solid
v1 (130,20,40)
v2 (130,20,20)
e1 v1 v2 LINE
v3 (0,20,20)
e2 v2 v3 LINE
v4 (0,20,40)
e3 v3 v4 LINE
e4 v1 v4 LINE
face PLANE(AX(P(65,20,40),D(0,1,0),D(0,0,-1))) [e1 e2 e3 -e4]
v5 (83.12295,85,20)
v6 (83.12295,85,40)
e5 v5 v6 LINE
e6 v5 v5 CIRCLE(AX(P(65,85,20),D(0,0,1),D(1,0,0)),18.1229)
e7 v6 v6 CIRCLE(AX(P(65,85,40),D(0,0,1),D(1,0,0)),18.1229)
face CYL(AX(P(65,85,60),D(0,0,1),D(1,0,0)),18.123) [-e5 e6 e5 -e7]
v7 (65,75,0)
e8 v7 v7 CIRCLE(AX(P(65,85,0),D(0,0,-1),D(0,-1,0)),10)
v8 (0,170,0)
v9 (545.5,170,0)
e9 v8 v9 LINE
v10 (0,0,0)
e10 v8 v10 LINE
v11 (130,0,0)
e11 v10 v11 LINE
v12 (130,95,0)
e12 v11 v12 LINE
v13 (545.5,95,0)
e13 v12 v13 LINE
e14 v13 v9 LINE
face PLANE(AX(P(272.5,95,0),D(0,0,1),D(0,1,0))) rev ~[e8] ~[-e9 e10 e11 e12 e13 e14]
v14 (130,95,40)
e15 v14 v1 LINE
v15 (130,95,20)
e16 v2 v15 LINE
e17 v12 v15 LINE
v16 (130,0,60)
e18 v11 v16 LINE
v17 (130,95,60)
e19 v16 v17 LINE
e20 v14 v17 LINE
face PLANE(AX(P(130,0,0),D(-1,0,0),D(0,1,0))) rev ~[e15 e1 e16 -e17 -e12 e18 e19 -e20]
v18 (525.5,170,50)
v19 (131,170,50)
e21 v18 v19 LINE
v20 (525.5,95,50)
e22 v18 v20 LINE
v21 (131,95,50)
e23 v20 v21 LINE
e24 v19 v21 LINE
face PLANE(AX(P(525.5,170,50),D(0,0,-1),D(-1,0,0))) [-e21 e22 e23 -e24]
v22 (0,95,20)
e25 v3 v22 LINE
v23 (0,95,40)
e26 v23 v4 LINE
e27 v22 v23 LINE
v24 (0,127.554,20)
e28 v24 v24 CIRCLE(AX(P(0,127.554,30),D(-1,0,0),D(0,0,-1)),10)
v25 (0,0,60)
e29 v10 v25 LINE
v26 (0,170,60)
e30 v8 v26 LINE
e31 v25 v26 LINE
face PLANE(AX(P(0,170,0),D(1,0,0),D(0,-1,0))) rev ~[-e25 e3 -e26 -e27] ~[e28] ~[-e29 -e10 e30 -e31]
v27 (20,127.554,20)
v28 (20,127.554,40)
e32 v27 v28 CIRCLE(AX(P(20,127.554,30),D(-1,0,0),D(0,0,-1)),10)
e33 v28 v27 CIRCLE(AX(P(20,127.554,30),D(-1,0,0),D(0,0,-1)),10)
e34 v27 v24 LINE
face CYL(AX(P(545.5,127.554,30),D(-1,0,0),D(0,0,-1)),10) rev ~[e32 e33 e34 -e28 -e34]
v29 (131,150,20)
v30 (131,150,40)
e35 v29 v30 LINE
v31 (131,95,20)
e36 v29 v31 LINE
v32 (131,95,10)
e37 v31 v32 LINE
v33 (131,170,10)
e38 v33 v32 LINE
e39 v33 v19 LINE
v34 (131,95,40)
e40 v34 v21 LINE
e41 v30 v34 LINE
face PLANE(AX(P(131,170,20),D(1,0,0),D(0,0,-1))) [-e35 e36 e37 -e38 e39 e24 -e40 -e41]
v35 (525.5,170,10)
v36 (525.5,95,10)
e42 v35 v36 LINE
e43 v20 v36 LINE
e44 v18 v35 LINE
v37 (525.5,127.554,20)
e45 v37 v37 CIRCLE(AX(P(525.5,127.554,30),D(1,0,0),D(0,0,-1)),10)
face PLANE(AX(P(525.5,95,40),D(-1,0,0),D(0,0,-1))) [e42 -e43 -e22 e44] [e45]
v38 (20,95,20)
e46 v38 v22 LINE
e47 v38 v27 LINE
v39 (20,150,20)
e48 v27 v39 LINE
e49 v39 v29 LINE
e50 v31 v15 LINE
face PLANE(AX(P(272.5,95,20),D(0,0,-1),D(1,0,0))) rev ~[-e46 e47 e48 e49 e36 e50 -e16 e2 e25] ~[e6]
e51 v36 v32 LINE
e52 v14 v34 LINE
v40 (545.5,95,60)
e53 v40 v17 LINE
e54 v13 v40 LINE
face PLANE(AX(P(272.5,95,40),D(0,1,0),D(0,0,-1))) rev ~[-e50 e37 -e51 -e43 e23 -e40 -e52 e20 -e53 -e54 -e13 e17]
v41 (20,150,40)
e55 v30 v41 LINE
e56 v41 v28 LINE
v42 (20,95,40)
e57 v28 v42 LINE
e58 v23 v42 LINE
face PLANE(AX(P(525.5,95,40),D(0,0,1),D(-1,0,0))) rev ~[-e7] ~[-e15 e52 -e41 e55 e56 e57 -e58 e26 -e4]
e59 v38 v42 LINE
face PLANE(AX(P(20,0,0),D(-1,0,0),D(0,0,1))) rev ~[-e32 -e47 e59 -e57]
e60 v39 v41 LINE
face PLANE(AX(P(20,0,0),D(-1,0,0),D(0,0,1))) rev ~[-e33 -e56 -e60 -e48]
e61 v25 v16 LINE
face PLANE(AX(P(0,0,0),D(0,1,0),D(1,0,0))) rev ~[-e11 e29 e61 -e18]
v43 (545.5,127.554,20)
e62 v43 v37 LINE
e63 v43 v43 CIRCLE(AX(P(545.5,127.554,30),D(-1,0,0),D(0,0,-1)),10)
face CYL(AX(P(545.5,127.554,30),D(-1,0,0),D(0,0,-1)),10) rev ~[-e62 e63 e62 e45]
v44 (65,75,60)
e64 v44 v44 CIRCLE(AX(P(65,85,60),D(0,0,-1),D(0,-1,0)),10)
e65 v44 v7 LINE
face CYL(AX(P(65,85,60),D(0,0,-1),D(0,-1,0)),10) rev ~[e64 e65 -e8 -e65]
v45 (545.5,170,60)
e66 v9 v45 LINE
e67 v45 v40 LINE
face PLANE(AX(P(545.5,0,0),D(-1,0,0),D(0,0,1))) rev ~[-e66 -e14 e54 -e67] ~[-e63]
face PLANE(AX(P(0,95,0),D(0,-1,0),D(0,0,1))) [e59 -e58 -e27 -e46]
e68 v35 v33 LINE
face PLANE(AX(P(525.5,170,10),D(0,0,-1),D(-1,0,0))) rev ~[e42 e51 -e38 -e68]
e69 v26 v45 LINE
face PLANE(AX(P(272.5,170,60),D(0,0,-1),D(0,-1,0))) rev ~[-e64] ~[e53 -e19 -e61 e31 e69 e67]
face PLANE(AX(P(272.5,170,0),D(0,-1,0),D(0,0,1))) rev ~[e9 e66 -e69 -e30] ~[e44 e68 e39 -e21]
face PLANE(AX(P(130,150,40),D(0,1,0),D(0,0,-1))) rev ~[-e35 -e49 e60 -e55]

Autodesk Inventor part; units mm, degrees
ref_plane "YZ Plane" through (0, 0, 0) normal (1, 0, 0) x (0, 1, 0)
ref_plane "XZ Plane" through (0, 0, 0) normal (0, 1, 0) x (-1, 0, 0)
sketch "Boceto1" plane through (0, 0, 0) normal (0, 0, 1) x (1, 0, 0)
  line L0 (0, 0) -> (130, 0)
  line L1 (130, 0) -> (130, 95)
  line L2 (130, 95) -> (545, 95)
  line L3 (545, 95) -> (545, 170)
  line L4 (545, 170) -> (0, 170)
  line L5 (0, 170) -> (0, 0)
  circle A0 centre (65, 85) radius 10
  dimension "d1" = 95
  dimension "d3" = 75
  dimension "d19" = 20
extrude "Extrusión1" add sketch "Boceto1" along normal blind 60 contours L5 L4 L3 L2 L1 L0 | A0
ref_plane "Plano de trabajo1" through (65, 0, 0) normal (1, 0, 0) x (0, 0, -1)
sketch "Boceto2" plane through (65, 0, 0) normal (1, 0, 0) x (0, 0, -1)
  line L0 (-20, 75) -> (-40, 75)
  line L1 (-40, 75) -> (-40, 20)
  line L2 (0, 0) -> (-60, 0) projected
  line L3 (-40, 20) -> (-20, 20)
  line L4 (-20, 75) -> (-20, 20)
  dimension "d8" = 20
  dimension "d9" = 55
  dimension "d10" = 20
extrude "Extrusión2" cut sketch "Boceto2" along normal blind 400 and the other way blind 200
sketch "Boceto3" plane through (130, 0, 0) normal (1, 0, 0) x (0, 0, -1)
  line L0 (-20, 75) -> (-40, 75) projected
  line L1 (-40, 75) -> (-40, 150)
  line L2 (0, 170) -> (-60, 170) projected
  line L3 (-40, 150) -> (-20, 150)
  line L4 (-20, 150) -> (-20, 75)
  point P0 (0, 0)
  dimension "d15" = 75
  dimension "d16" = 20
extrude "Extrusión3" cut sketch "Boceto3" along normal mid plane 7000
sketch "Boceto4" plane through (65, 0, 0) normal (1, 0, 0) x (0, 0, -1)
  point P0 (0, 0)
sketch "Boceto5" plane through (0, 0, 60) normal (0, 0, 1) x (1, 0, 0)
  line L0 (130, 95) -> (545, 95) projected
  line L1 (545, 170) -> (0, 170) projected
  line L2 (0, 0) -> (130, 0) projected
  point P0 (65, 85)
hole "Agujero1" at (65, 85, 60) direction (0, 0, -1) diameter 0.2159 end through all thread size "30-318 UNM" class "2B" standard "ANSI Unified Screw Threads"
sketch "Boceto6" plane through (0, 0, 0) normal (-1, 0, 0) x (0, 0, 1)
  line L0 (0, 170) -> (0, 0) projected
  line L1 (40, 95) -> (60, 95) projected
  line L2 (0, 95) -> (60, 95)
  line L3 (0, 95) -> (0, 170)
  line L4 (0, 170) -> (60, 170) projected
  line L5 (60, 170) -> (60, 95)
extrude "Extrusión4" add sketch "Boceto6" against normal blind 20
ref_plane "Plano de trabajo8" through (272.5, 0, 0) normal (-1, 0, 0) x (0, 0, 1)
sketch "Boceto7" plane through (272.5, 0, 0) normal (-1, 0, 0) x (0, 0, 1)
  line L0 (40, 95) -> (60, 95) projected
  line L1 (0, 75) -> (0, 95) projected
  line L2 (60, 95) -> (0, 95)
  line L3 (0, 95) -> (0, 170)
  line L4 (0, 170) -> (60, 170)
  line L5 (60, 0) -> (60, 95) projected
  line L6 (60, 170) -> (60, 95)
  point P0 (0, 0)
extrude "Extrusión5" add sketch "Boceto7" against normal blind 273
sketch "Boceto8" plane through (130, 95, 0) normal (0, -1, 0) x (1, 0, 0)
  line L0 (-130, 60) -> (415.5, 60) projected
  line L1 (415.5, 0) -> (415.5, 60) projected
  line L2 (395.5, 40) -> (395.5, 20)
  line L3 (0, 0) -> (415.5, 0) projected
  line L4 (395.5, 40) -> (142.5, 40)
  line L5 (142.5, 20) -> (0, 20) projected
  line L6 (142.5, 40) -> (142.5, 20)
  line L7 (142.5, 20) -> (395.5, 20)
  point P0 (-130, 0)
  point P1 (415, 60)
  point P2 (415, 0)
  point P3 (415, 20)
  dimension "d35" = 20
extrude "Extrusión6" cut sketch "Boceto8" against normal blind 75
sketch "Boceto9" plane through (130, 95, 0) normal (0, -1, 0) x (1, 0, 0)
  line L0 (142.5, 20) -> (142.5, 40) projected
  line L1 (142.5, 20) -> (142.5, 40)
  line L2 (142.5, 40) -> (1, 40)
  line L3 (1, 40) -> (1, 20)
  line L4 (142.5, 20) -> (-110, 20) projected
  line L5 (1, 20) -> (142.5, 20)
  point P0 (-130, 0)
extrude "Extrusión7" cut sketch "Boceto9" against normal blind 75
sketch "Boceto10" plane through (0, 0, 60) normal (0, 0, 1) x (1, 0, 0)
  point P0 (0, 0)
ref_plane "Plano de trabajo9" through (535.5, 0, 0) normal (1, 0, 0) x (0, 0, -1)
sketch "Boceto11" plane through (545.5, 0, 0) normal (1, 0, 0) x (0, 0, -1)
  line L0 (0, 95) -> (-20, 95) projected
  line L1 (0, 170) -> (-60, 170) projected
  line L2 (0, 95) -> (-60, 170)
  line L3 (-60, 84.892) -> (-60, 85.108) projected
  line L4 (0, 170) -> (-60, 85.108)
  circle A0 centre (-30, 127.554) radius 10
  point P0 (0, 0)
  dimension "d40" = 20
hole "Agujero2" at (545.5, 127.554, 30) direction (-1, 0, 0) diameter 20 end through all
sketch "Boceto12" plane through (0, 0, 60) normal (0, 0, 1) x (1, 0, 0)
  line L0 (0, 170) -> (0, 0) projected
  line L1 (130, 0) -> (130, 95) projected
  line L2 (0, 170) -> (130, 0)
  line L3 (130, 95) -> (130, 170)
  line L4 (130, 170) -> (0, 0)
  circle A0 centre (65, 85) radius 10
  dimension "d48" = 20
hole "Agujero3" at (65, 85, 60) direction (0, 0, -1) diameter 20 end through all
extrude "Extrusión8" [suppressed]
hole "Agujero4" at (65, 85, 60) direction (0, 0, -1) diameter 17.8943 end through all thread size "13/16-10 UNC" class "2B" standard "ANSI Unified Screw Threads"
sketch "Boceto13" plane through (0, 170, 60) normal (0, 1, 0) x (1, 0, 0)
  line L0 (131, 40) -> (131, 50)
  line L1 (525.5, 20) -> (525.5, 40) projected
  line L2 (525.5, 40) -> (525.5, 50)
  line L3 (525.5, 50) -> (131, 50)
  line L4 (131, 40) -> (525.5, 40) projected
  line L5 (131, 40) -> (525.5, 40)
  line L6 (525.5, 20) -> (131, 20) projected
  line L7 (131, 20) -> (131, 10)
  line L8 (525.5, 20) -> (525.5, 10)
  line L9 (525.5, 10) -> (131, 10)
  point P0 (0, 60)
  dimension "d65" = 10
  dimension "d66" = 10
  dimension "d67" = 10
  dimension "d68" = 10
extrude "Extrusión9" cut sketch "Boceto13" against normal through all
sketch "Boceto14" plane through (130, 20, 40) normal (0, 0, -1) x (-1, 0, 0)
  circle A0 centre (65, 65) radius 10 projected
  circle A1 centre (65, 65) radius 10
  point P0 (130, -20)
extrude "Extrusión10" add sketch "Boceto14" along normal blind 40
sketch "Boceto15" plane through (0, 0, 60) normal (0, 0, 1) x (1, 0, 0)
  circle A0 centre (65, 85) radius 10
  circle A1 centre (65, 85) radius 18.123
  point P0 (0, 0)
  dimension "d80" = 36.246
hole "Agujero5" at (65, 85, 60) direction (0, 0, -1) diameter 36.2458 end through all thread size "1 9/16-8 UN" class "2B" standard "ANSI Unified Screw Threads"
extrude "Extrusión11" add sketch "Boceto15" along normal mid plane 150 contours A0 | A1
sketch "Boceto16" plane through (0, 0, 0) normal (0, -1, 0) x (1, 0, 0)
  line L0 (0, 60) -> (0, 142)
  line L1 (130, 40) -> (130, 60) projected
  line L2 (130, 60) -> (130, 150)
  line L3 (130, 150) -> (0, 142)
  line L4 (0, 60) -> (130, 60)
  line L5 (131, 50) -> (525.5, 50) projected
  point P0 (0, 0)
extrude "Extrusión12" cut sketch "Boceto16" against normal blind 150
sketch "Boceto17" plane through (0, 170, 60) normal (0, 1, 0) x (1, 0, 0)
  line L0 (0, 60) -> (130, 60) projected
  line L1 (0, 60) -> (0, 117)
  line L2 (130, 60) -> (130, 106)
  line L3 (0, 60) -> (130, 60)
  line L4 (0, 117) -> (130, 106)
extrude "Extrusión13" cut sketch "Boceto17" against normal blind 150
sketch "Boceto18" plane through (0, 0, 60) normal (0, 0, 1) x (1, 0, 0)
  circle A0 centre (65, 85) radius 10
  point P0 (0, 0)
  dimension "d87" = 20
hole "Agujero6" at (65, 85, 60) direction (0, 0, -1) diameter 0.2159 end through all thread size "30-318 UNM" class "2B" standard "ANSI Unified Screw Threads"
hole "Agujero7" at (65, 85, 60) direction (0, 0, -1) diameter 20 end through all
thread "Rosca1" size "M20x2.5" class "6H" standard "ANSI Metric M Profile" full length
properties part number "PiezaMovil"
